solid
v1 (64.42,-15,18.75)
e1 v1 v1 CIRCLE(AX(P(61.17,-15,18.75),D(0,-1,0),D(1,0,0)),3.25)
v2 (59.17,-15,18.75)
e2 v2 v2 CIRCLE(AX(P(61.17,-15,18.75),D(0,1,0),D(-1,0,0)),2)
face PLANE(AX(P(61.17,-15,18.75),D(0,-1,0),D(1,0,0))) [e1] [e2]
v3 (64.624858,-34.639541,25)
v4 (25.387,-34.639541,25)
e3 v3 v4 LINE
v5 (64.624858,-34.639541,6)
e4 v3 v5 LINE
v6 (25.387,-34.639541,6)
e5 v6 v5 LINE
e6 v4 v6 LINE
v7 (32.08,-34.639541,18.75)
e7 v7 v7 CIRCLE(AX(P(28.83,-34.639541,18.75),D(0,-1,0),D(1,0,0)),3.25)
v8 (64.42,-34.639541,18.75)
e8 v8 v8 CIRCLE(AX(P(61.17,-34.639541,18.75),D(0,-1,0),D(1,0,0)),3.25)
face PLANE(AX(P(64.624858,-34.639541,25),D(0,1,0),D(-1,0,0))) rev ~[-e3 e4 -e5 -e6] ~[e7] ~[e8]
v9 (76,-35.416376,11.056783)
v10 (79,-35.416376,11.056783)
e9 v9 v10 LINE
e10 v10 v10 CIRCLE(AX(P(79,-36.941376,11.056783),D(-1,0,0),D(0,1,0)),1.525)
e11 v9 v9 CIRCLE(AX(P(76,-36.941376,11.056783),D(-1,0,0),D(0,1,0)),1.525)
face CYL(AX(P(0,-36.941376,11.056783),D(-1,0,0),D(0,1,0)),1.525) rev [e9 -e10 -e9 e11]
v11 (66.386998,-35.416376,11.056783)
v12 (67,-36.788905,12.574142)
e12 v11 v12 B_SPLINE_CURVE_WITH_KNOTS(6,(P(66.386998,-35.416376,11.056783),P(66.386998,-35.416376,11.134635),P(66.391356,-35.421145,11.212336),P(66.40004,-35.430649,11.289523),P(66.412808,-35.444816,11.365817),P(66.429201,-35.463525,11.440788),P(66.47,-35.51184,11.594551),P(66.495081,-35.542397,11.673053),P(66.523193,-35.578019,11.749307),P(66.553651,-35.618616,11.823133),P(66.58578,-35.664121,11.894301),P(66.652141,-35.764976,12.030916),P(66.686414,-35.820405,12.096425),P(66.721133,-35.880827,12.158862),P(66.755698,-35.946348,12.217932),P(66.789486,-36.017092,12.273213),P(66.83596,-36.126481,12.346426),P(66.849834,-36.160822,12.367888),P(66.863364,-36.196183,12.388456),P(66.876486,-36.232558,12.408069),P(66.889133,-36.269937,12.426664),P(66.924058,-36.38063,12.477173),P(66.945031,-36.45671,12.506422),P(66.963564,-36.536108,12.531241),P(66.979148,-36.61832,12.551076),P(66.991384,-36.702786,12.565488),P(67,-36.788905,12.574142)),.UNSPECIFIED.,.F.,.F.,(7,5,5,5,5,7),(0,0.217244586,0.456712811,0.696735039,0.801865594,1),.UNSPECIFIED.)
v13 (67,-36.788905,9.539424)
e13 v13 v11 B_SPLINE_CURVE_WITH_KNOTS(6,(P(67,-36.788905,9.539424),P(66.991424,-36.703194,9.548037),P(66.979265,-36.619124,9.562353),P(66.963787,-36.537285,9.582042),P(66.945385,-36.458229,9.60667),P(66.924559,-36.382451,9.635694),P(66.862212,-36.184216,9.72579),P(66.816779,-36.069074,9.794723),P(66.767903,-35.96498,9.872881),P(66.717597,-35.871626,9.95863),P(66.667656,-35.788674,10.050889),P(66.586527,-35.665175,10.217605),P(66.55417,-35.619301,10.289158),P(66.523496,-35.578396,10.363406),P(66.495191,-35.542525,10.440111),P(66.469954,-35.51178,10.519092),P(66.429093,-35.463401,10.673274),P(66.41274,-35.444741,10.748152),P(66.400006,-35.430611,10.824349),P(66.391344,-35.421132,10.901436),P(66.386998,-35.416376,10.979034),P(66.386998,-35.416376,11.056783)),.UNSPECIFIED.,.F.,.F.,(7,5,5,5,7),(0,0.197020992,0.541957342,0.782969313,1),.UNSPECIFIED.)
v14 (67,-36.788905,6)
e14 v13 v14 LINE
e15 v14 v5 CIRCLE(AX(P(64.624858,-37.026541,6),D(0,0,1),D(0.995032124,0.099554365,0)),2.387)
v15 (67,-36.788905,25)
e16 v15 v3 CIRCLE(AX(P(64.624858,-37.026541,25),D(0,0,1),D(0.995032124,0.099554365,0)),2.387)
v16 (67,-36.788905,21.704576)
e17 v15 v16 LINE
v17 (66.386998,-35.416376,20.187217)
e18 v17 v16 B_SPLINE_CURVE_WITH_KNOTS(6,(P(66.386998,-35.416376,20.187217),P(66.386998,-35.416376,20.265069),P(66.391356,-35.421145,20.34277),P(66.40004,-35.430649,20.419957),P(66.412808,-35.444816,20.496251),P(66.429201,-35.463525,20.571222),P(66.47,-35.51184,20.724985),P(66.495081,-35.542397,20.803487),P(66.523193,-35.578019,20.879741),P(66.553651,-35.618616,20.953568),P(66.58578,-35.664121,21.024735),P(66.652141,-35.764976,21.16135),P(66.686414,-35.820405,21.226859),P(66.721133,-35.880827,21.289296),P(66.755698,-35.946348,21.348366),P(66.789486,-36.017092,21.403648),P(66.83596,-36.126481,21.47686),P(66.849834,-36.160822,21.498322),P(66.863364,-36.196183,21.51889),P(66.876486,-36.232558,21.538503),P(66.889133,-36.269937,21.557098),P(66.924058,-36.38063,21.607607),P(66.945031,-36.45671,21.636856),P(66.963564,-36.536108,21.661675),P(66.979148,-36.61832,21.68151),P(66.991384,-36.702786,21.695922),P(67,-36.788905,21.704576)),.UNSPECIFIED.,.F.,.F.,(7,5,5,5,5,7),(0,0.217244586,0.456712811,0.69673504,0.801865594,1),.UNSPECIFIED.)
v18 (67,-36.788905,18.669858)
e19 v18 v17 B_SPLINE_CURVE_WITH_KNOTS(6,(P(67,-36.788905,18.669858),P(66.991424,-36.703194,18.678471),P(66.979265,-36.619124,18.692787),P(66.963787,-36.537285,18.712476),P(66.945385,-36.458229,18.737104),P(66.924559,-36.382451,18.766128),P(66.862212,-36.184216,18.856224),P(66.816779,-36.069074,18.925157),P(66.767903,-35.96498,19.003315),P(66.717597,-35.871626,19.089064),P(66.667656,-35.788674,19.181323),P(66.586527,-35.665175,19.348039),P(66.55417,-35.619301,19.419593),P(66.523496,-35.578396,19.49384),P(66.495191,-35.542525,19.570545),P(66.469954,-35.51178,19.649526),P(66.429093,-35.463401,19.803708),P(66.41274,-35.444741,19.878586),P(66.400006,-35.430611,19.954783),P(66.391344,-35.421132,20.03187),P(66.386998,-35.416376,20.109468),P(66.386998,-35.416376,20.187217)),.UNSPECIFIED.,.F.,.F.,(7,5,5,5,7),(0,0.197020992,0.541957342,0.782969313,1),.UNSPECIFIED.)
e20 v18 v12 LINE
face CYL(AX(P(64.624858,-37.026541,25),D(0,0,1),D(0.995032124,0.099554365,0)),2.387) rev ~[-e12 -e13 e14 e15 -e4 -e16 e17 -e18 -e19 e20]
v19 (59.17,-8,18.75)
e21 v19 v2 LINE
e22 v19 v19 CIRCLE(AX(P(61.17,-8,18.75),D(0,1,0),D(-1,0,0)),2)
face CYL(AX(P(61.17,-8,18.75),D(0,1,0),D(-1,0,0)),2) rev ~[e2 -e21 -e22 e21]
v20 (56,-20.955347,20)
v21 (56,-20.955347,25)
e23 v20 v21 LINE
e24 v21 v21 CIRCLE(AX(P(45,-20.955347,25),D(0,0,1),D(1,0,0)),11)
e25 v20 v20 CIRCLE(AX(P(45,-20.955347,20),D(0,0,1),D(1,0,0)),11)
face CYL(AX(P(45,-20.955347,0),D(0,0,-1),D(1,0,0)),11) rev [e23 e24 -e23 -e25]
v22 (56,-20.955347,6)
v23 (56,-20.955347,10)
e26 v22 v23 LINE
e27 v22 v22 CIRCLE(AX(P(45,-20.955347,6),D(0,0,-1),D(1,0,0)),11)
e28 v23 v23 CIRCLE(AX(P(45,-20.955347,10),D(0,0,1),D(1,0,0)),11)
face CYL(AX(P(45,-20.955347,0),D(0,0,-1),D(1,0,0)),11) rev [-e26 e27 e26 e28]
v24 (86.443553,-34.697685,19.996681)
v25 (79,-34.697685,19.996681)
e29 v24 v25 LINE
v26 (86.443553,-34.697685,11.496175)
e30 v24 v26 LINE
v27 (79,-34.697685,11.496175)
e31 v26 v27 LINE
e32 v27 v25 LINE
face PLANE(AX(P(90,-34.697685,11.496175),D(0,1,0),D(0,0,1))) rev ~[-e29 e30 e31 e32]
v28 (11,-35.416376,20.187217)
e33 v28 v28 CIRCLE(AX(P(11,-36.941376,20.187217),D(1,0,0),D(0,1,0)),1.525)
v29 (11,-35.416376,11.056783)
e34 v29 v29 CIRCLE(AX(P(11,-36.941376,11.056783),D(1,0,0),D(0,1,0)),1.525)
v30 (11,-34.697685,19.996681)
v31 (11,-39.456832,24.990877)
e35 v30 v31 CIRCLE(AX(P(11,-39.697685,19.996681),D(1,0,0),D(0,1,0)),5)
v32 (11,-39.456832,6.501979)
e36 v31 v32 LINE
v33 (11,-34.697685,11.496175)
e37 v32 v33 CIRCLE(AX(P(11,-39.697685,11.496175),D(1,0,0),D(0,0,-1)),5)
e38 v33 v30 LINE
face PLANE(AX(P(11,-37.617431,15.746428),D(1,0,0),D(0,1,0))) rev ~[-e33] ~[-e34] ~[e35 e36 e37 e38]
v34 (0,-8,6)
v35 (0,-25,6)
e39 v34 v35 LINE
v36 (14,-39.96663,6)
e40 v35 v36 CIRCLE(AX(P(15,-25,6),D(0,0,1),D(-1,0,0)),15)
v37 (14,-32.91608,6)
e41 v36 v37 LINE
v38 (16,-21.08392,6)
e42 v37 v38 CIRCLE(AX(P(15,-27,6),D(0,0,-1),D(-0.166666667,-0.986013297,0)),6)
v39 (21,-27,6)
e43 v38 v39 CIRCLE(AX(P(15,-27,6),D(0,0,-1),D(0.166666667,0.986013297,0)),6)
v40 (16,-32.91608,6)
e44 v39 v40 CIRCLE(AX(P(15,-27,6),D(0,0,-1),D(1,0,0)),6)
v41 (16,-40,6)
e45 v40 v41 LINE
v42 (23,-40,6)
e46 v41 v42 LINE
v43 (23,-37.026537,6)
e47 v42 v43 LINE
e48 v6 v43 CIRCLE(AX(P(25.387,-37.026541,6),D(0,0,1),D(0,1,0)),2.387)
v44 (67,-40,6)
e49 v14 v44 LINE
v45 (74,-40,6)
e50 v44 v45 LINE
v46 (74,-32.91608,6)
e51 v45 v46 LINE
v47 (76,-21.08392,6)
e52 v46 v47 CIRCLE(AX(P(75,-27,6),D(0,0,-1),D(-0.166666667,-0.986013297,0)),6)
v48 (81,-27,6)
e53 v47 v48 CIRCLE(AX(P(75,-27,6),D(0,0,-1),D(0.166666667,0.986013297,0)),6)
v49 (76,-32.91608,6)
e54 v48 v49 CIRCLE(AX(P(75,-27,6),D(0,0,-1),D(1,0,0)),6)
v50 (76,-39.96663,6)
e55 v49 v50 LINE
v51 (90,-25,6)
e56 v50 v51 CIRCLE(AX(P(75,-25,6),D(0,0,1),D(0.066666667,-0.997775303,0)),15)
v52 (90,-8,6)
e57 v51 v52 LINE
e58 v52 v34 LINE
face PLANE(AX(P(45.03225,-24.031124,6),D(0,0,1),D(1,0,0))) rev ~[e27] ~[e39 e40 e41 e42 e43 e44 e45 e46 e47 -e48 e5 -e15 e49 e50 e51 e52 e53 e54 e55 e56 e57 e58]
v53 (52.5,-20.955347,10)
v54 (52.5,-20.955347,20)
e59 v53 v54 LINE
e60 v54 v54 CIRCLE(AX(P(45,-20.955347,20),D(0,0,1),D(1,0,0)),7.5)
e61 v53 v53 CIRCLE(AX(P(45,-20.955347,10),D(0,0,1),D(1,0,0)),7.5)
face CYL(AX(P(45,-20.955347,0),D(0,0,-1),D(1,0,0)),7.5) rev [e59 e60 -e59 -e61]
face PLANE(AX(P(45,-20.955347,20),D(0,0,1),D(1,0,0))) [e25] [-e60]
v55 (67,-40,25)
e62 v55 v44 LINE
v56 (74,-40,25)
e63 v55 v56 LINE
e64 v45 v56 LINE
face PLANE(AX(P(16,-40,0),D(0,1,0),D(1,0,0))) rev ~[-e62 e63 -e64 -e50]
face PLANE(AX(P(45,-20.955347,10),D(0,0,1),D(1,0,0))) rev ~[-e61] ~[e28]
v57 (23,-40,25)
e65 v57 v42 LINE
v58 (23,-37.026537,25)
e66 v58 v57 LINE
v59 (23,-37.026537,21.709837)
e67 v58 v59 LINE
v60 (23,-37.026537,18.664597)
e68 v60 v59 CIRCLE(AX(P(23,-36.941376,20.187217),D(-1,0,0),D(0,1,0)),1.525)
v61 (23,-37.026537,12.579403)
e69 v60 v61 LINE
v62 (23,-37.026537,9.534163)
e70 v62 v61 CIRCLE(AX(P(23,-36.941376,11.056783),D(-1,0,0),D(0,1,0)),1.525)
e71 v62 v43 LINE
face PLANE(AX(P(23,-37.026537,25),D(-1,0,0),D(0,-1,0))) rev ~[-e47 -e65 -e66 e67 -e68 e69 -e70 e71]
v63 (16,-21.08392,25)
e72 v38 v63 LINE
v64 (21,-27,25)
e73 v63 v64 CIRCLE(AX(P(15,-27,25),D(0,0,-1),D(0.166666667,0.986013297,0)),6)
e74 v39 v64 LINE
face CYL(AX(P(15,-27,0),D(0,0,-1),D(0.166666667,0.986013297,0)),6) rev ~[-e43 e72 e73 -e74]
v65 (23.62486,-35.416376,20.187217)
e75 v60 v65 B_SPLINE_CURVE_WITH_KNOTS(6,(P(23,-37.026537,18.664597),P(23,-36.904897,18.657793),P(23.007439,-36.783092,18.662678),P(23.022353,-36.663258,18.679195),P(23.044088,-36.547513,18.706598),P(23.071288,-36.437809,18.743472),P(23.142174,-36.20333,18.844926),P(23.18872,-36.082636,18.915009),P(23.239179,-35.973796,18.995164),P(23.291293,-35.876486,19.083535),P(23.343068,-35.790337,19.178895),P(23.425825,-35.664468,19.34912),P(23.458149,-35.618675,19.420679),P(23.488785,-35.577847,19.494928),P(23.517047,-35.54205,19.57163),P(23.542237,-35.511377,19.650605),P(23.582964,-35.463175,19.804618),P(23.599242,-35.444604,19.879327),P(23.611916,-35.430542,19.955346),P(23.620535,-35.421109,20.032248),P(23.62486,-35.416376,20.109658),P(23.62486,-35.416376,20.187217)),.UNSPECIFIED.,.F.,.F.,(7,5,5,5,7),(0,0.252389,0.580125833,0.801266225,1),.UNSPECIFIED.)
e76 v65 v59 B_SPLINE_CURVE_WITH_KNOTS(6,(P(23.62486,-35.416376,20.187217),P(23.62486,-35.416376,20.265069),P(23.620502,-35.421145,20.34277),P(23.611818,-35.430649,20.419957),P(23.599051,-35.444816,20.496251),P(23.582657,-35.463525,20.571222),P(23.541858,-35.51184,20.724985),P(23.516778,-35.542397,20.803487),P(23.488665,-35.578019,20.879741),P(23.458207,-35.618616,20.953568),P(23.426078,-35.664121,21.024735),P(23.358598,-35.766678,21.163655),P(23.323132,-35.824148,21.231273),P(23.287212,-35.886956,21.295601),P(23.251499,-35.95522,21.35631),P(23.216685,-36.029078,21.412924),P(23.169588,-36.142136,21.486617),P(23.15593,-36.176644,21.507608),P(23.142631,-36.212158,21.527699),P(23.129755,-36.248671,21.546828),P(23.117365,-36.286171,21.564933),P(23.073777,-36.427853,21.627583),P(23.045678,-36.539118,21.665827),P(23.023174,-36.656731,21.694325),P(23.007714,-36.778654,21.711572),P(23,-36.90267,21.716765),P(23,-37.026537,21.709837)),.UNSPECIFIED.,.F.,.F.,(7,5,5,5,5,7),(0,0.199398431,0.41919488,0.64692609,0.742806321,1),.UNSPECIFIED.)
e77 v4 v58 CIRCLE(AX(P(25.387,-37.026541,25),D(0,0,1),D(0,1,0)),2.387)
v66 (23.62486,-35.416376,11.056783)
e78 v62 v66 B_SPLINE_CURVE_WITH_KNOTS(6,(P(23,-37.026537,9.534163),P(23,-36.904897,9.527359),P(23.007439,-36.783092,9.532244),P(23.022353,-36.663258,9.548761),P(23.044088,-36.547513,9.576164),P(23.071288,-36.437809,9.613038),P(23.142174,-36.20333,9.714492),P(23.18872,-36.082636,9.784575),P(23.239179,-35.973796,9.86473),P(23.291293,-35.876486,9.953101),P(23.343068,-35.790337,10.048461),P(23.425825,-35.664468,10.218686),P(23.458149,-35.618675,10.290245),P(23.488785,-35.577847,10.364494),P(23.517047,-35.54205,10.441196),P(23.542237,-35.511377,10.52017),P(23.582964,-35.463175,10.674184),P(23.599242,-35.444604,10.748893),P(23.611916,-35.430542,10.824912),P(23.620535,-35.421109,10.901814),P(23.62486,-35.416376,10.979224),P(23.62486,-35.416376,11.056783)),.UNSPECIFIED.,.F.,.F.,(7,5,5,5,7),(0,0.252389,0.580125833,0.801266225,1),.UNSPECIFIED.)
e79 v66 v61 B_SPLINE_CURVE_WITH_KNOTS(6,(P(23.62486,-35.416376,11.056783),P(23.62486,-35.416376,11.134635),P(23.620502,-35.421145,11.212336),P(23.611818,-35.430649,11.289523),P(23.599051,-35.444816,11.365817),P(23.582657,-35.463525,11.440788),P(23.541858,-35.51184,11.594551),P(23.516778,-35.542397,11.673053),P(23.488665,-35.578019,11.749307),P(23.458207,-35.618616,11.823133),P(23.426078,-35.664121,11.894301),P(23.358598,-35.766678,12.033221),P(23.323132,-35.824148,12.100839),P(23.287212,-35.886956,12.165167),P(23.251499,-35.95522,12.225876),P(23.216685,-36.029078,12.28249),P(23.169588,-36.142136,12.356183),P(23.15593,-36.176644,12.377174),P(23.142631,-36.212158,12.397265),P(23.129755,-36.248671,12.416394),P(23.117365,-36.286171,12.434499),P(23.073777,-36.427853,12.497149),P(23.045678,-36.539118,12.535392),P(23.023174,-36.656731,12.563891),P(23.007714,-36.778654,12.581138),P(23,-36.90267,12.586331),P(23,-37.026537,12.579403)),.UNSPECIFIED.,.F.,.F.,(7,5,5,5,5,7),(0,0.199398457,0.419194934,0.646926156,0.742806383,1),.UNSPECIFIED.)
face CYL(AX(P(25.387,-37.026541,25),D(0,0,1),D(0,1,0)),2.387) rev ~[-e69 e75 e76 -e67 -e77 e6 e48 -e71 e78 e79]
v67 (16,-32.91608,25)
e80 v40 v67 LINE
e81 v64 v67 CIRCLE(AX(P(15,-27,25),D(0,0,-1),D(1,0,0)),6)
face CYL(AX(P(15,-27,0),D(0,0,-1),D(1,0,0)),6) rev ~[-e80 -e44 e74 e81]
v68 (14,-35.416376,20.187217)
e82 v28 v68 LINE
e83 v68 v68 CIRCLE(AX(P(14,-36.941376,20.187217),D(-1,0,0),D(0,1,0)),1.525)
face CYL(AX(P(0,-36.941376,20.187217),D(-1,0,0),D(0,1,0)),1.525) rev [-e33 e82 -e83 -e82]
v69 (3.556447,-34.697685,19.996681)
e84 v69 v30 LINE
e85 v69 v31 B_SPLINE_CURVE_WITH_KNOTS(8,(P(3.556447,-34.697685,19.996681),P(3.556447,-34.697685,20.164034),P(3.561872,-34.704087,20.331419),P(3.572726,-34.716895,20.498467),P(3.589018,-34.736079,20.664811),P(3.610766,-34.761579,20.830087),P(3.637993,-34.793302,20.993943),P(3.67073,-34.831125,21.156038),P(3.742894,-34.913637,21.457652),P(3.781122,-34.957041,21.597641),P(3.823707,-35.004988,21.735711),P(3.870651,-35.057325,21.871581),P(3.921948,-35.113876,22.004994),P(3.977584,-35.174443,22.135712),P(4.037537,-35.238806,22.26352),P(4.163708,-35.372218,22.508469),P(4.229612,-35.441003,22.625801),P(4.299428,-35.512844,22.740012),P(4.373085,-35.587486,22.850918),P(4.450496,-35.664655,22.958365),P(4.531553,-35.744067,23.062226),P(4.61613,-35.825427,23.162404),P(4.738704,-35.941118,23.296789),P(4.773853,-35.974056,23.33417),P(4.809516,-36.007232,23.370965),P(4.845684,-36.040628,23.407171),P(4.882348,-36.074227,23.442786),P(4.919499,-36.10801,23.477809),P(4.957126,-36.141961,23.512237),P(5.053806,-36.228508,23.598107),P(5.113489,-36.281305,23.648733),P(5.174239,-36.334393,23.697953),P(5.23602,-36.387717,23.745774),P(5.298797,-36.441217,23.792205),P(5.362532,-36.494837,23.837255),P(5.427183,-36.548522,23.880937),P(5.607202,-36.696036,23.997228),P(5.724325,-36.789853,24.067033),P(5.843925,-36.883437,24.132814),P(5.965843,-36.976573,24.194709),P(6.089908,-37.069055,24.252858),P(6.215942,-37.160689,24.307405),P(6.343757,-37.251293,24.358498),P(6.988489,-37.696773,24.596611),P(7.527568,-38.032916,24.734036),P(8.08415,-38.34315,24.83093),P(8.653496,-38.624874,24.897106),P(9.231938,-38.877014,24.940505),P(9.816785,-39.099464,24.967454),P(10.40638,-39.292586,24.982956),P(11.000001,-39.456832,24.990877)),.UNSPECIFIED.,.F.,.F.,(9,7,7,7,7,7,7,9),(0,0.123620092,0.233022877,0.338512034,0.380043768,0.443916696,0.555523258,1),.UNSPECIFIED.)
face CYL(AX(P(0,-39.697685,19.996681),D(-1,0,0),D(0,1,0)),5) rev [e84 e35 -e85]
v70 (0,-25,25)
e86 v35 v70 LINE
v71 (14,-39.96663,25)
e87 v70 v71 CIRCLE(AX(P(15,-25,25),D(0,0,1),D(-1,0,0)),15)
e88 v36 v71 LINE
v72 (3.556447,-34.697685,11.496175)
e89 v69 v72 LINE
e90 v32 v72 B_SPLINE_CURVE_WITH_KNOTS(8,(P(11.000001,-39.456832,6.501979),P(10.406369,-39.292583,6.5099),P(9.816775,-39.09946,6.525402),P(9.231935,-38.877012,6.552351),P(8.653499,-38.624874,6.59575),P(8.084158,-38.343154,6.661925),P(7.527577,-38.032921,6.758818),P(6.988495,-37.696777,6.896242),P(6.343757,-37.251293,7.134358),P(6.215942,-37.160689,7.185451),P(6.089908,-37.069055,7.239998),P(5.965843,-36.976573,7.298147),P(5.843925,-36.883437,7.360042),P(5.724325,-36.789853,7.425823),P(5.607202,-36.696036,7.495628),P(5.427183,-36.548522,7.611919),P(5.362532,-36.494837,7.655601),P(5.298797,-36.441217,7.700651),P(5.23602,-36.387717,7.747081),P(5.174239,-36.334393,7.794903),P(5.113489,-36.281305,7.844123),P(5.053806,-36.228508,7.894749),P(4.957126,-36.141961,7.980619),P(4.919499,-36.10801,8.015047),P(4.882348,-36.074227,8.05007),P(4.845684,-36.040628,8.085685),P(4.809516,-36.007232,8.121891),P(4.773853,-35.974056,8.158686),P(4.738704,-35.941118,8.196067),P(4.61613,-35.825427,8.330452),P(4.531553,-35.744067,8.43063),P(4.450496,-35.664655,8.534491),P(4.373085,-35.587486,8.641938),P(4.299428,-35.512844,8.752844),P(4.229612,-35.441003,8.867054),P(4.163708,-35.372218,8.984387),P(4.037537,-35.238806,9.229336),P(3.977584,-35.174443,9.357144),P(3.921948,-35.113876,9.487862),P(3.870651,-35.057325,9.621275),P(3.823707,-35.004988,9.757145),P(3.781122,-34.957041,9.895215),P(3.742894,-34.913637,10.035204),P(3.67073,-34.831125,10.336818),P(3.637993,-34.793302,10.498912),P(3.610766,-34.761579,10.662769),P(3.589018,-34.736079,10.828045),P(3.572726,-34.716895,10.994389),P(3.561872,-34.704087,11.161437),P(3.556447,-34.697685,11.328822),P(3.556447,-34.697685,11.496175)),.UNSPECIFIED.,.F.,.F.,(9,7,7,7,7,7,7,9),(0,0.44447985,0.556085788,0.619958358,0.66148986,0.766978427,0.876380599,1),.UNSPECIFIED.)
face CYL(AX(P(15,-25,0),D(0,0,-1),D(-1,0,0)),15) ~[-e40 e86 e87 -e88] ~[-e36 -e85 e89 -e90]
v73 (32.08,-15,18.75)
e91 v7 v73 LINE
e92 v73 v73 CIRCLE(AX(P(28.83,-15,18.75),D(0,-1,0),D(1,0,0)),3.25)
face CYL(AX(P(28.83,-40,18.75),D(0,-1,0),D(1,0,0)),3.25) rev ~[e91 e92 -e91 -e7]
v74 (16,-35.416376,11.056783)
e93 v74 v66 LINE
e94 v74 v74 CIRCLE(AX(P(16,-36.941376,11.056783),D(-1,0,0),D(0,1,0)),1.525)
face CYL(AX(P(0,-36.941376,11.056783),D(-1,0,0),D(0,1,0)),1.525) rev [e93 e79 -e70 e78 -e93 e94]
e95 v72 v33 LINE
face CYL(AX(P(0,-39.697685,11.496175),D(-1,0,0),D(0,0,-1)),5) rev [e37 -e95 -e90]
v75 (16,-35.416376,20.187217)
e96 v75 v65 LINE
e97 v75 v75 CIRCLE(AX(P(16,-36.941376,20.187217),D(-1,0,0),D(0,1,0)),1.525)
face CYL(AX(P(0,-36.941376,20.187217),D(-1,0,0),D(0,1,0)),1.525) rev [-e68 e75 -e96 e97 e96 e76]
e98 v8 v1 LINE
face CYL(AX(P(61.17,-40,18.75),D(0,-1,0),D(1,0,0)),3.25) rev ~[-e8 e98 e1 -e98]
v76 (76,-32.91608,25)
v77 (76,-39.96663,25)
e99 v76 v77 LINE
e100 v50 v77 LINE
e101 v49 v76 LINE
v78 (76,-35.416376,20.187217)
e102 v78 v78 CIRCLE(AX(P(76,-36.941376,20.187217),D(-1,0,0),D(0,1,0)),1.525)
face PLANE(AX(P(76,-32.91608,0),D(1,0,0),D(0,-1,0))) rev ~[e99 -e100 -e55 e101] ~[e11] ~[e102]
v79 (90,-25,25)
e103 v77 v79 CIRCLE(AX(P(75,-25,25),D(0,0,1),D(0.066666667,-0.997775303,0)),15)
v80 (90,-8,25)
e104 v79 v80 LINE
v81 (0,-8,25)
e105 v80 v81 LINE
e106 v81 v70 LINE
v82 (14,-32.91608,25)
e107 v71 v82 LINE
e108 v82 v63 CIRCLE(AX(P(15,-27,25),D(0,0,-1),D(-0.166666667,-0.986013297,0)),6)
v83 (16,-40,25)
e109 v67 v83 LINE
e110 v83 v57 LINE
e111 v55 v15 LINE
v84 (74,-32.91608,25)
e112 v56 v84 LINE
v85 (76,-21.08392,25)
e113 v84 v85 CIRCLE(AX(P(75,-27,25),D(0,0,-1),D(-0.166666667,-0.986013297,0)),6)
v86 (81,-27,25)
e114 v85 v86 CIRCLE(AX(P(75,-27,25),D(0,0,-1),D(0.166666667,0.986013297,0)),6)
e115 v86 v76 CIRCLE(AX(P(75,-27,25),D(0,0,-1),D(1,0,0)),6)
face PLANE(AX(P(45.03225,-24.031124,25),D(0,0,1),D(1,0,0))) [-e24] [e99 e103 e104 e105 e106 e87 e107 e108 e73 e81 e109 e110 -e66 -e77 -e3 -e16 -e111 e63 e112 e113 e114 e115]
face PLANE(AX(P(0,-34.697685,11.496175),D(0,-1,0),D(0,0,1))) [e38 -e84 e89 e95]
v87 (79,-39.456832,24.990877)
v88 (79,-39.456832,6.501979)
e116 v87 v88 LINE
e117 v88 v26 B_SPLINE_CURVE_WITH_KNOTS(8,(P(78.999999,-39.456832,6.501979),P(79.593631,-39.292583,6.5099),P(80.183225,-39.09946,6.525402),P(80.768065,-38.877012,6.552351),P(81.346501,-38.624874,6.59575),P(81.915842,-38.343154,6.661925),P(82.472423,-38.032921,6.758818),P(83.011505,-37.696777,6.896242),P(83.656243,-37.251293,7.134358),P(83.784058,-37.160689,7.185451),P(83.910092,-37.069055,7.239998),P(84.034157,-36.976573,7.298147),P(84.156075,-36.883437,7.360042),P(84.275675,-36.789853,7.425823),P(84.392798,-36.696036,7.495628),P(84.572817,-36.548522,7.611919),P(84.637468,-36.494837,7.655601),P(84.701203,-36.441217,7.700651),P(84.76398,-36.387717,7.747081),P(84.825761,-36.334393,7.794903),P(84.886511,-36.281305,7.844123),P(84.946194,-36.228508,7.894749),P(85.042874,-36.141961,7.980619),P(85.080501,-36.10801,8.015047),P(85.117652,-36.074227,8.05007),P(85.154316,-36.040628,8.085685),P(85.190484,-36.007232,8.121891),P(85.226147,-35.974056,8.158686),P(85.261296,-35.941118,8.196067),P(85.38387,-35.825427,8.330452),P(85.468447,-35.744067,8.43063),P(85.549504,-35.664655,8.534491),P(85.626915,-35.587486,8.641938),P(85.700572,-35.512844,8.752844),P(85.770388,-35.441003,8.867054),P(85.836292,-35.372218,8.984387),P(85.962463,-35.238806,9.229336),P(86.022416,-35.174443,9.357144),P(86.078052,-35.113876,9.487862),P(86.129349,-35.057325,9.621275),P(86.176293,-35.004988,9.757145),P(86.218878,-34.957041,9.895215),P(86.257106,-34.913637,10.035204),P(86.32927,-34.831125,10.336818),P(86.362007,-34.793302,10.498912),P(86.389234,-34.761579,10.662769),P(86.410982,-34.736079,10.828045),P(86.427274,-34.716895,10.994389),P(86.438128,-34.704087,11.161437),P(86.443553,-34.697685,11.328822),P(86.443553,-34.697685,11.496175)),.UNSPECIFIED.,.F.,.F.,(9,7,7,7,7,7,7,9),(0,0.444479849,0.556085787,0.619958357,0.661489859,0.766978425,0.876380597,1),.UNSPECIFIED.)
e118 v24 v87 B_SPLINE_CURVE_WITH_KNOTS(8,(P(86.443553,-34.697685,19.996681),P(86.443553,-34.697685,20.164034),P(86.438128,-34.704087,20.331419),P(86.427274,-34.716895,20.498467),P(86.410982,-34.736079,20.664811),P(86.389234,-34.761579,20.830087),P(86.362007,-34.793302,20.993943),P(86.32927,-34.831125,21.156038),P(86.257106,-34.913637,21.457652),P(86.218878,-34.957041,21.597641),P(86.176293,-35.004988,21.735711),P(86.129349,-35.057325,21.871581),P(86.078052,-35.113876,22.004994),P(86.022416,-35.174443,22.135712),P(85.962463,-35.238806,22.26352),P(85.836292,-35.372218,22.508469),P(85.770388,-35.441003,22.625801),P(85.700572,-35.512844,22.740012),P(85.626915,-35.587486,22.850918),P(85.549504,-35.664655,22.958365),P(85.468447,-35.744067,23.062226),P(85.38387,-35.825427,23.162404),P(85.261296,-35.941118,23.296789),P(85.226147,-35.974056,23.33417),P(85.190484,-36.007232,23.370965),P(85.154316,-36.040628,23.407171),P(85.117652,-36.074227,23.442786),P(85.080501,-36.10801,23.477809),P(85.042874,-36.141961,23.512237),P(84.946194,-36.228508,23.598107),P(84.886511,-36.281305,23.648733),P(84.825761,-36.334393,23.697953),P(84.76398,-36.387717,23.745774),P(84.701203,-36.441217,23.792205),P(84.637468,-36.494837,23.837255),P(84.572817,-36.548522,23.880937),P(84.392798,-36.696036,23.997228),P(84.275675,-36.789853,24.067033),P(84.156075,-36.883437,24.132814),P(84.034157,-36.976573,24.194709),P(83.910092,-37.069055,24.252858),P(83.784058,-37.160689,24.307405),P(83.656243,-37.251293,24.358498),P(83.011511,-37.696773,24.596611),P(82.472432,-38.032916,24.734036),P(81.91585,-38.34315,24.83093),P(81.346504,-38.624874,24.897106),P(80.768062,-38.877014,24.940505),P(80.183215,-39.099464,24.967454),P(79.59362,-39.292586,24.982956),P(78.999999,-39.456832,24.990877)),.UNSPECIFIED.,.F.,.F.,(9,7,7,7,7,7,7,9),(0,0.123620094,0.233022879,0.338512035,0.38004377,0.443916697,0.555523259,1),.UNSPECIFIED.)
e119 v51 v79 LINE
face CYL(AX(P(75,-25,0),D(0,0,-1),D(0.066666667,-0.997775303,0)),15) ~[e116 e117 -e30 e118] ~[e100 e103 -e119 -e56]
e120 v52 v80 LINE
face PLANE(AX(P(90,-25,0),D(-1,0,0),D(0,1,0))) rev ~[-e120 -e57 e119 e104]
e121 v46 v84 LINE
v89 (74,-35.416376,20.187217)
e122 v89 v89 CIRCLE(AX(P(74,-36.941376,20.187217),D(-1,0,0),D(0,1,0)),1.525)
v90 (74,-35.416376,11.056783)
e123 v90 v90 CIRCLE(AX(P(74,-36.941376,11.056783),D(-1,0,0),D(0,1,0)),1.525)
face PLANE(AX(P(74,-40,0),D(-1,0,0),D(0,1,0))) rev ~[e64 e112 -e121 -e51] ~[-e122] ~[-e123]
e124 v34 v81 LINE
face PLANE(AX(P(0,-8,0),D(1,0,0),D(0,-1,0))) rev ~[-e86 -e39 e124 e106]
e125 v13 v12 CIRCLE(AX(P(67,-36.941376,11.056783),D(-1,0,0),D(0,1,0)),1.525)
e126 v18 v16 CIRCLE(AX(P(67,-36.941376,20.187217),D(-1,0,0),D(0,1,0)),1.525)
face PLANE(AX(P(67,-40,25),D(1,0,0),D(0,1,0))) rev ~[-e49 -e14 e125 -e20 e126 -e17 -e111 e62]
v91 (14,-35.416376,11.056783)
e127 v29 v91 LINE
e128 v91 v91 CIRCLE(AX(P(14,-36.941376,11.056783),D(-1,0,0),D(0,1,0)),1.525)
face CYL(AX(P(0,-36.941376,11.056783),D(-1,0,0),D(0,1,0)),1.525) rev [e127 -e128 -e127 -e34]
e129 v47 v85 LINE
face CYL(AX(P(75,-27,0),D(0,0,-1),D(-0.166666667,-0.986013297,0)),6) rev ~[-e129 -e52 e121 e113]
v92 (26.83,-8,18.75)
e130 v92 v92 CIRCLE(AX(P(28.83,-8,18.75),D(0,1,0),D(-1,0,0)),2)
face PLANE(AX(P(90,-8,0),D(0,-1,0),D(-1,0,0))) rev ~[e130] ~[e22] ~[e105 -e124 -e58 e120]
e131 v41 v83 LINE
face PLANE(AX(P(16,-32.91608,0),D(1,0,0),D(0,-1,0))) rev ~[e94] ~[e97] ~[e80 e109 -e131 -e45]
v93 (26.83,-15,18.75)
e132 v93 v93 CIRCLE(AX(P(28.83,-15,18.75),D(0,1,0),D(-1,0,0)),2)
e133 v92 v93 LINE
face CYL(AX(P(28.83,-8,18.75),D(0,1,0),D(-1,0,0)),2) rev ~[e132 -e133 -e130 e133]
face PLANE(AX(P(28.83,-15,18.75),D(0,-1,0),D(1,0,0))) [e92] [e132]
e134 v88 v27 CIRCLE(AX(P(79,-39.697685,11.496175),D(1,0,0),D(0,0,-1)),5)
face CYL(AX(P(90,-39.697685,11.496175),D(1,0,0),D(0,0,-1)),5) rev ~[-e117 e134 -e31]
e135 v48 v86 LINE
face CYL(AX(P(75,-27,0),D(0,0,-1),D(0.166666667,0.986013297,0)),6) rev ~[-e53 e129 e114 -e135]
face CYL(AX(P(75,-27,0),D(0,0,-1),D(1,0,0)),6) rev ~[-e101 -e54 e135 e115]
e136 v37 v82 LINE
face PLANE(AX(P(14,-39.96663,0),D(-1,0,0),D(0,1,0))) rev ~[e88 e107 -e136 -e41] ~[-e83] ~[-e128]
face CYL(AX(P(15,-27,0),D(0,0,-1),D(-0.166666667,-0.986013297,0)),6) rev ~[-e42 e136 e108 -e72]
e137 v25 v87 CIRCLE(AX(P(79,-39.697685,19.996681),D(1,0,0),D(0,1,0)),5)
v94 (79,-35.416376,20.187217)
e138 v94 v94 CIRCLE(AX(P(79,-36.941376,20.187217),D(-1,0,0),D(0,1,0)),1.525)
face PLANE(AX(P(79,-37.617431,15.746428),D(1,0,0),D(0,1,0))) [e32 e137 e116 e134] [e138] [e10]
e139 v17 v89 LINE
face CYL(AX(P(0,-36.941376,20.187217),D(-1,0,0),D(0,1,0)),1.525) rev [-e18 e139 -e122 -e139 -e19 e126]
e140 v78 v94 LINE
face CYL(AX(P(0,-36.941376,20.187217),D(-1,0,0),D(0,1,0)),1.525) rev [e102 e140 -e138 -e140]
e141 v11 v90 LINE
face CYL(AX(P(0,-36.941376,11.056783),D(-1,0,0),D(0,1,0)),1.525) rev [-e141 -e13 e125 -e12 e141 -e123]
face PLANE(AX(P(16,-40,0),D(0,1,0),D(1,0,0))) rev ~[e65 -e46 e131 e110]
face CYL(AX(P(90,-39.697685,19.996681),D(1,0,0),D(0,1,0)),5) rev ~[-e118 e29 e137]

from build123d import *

# Parameters (mm, degrees)
F0_R      = 11
F1_DEPTH  = 25
F3_R      = 1.525
F4_DEPTH  = 105.2
F5_DEPTH  = 11
F7_DEPTH  = 11
F0_R_2    = 7.5
F8_DEPTH  = 20
F9_DEPTH  = 5
F10_R     = 2
F11_DEPTH = 10
F13_DEPTH = 25.0010001
F14_DEPTH = 6
F15_DEPTH = 10
F16_R     = 3.25
F17_DEPTH = 25


# Not quite as in the source:
# - a feature names something its author has since deleted; it is built from what else it names


with BuildPart() as f1:
    # F0 (on Top) → F1 (new body)
    with BuildSketch(Plane.XY):
        with BuildLine():
            Line((90, -8), (0, -8))
            Line((0, -8), (0, -25))
            ThreePointArc((0, -25), (4.0455488499, -35.246950766), (14, -39.9666295471))
            Line((14, -39.9666295471), (14, -32.9160797831))
            ThreePointArc((14, -32.9160797831), (9, -27), (14, -21.0839202169))
            Line((14, -21.0839202169), (14, -14))
            Line((14, -14), (16, -14))
            Line((16, -14), (16, -21.0839202169))
            ThreePointArc((16, -21.0839202169), (19.582575695, -23.1270166538), (21, -27))
            ThreePointArc((21, -27), (19.582575695, -30.8729833462), (16, -32.9160797831))
            Line((16, -32.9160797831), (16, -40))
            Line((16, -40), (74, -40))
            Line((74, -40), (74, -32.9160797831))
            ThreePointArc((74, -32.9160797831), (69, -27), (74, -21.0839202169))
            Line((74, -21.0839202169), (74, -14))
            Line((74, -14), (76, -14))
            Line((76, -14), (76, -21.0839202169))
            ThreePointArc((76, -21.0839202169), (79.582575695, -23.1270166538), (81, -27))
            ThreePointArc((81, -27), (79.582575695, -30.8729833462), (76, -32.9160797831))
            Line((76, -32.9160797831), (76, -39.9666295471))
            ThreePointArc((76, -39.9666295471), (85.9544511501, -35.246950766), (90, -25))
            Line((90, -25), (90, -8))
        make_face()
        with Locations((45, -20.9553470761)):
            Circle(F0_R, mode=Mode.SUBTRACT)
        with BuildLine():
            Line((14, -14), (14, -21.0839202169))
            ThreePointArc((14, -21.0839202169), (15, -21), (16, -21.0839202169))
            Line((16, -21.0839202169), (16, -14))
            Line((16, -14), (14, -14))
        make_face()
        with BuildLine():
            ThreePointArc((74, -21.0839202169), (75, -21), (76, -21.0839202169))
            Line((76, -21.0839202169), (76, -14))
            Line((76, -14), (74, -14))
            Line((74, -14), (74, -21.0839202169))
        make_face()
    extrude(amount=F1_DEPTH)

    # F3 (on Right) → F4 (cut)
    with BuildSketch(Plane.YZ):
        with Locations((-36.9413755834, 11.0567829106)):
            Circle(F3_R)
        with Locations((-36.9413755834, 20.1872170437)):
            Circle(F3_R)
    extrude(amount=F4_DEPTH, mode=Mode.SUBTRACT)

    # F3 (on Right) → F5 (cut)
    with BuildSketch(Plane.YZ):
        with BuildLine():
            Line((-39.7998355329, 24.9966811389), (-39.7998355329, 6.4961747266))
            Line((-39.7998355329, 6.4961747266), (-39.6976853907, 6.4961747266))
            ThreePointArc((-39.6976853907, 6.4961747266), (-36.1621514848, 7.9606408207), (-34.6976853907, 11.4961747266))
            Line((-34.6976853907, 11.4961747266), (-34.6976853907, 19.9966811389))
            ThreePointArc((-34.6976853907, 19.9966811389), (-36.1621514848, 23.5322150448), (-39.6976853907, 24.9966811389))
            Line((-39.6976853907, 24.9966811389), (-39.7998355329, 24.9966811389))
        make_face()
        with Locations((-36.9413755834, 11.0567829106)):
            Circle(F3_R, mode=Mode.SUBTRACT)
        with Locations((-36.9413755834, 20.1872170437)):
            Circle(F3_R, mode=Mode.SUBTRACT)
    extrude(amount=F5_DEPTH, mode=Mode.SUBTRACT)

    # F6 (on offset) → F7 (cut)
    with BuildSketch(Plane.YZ.offset(90)):
        with BuildLine():
            Line((-39.7998355329, 24.9966811389), (-39.7998355329, 6.4961747266))
            Line((-39.7998355329, 6.4961747266), (-39.6976853907, 6.4961747266))
            ThreePointArc((-39.6976853907, 6.4961747266), (-36.1621514848, 7.9606408207), (-34.6976853907, 11.4961747266))
            Line((-34.6976853907, 11.4961747266), (-34.6976853907, 19.9966811389))
            ThreePointArc((-34.6976853907, 19.9966811389), (-36.1621514848, 23.5322150448), (-39.6976853907, 24.9966811389))
            Line((-39.6976853907, 24.9966811389), (-39.7998355329, 24.9966811389))
        make_face()
    extrude(amount=-F7_DEPTH, mode=Mode.SUBTRACT)

    # F0 (on Top) → F8 (join)
    with BuildSketch(Plane.XY):
        with Locations((45, -20.9553470761)):
            Circle(F0_R)
        with Locations((45, -20.9553470761)):
            Circle(F0_R_2, mode=Mode.SUBTRACT)
    extrude(amount=F8_DEPTH)

    # F0 (on Top) → F9 (cut)
    with BuildSketch(Plane.XY):
        with Locations((45, -20.9553470761)):
            Circle(F0_R)
        with Locations((45, -20.9553470761)):
            Circle(F0_R_2, mode=Mode.SUBTRACT)
    extrude(amount=F9_DEPTH, mode=Mode.SUBTRACT)

    # F10 (on face) → F11 (cut)
    with BuildSketch(Plane(origin=(0, -8, 0), x_dir=(-1, 0, 0), z_dir=(0, 1, 0))):
        with Locations((-28.83, 18.75)):
            Circle(F10_R)
        with Locations((-61.17, 18.75)):
            Circle(F10_R)
    extrude(amount=-F11_DEPTH, mode=Mode.SUBTRACT)

    # F12 (on face) → F13 (cut, through all)
    with BuildSketch(Plane.XY.offset(25)):
        with BuildLine():
            Line((45, -40), (45, -34.6395410597))
            Line((45, -34.6395410597), (25.387, -34.6395410597))
            ThreePointArc((25.387, -34.6395410597), (23.6991374304, -35.338675856), (23, -37.0265373344))
            Line((23, -37.0265373344), (23, -40))
            Line((23, -40), (45, -40))
        make_face()
        with BuildLine():
            ThreePointArc((67, -36.7889047916), (66.2265029782, -35.2566531011), (64.6248583192, -34.6395410597))
            Line((64.6248583192, -34.6395410597), (45, -34.6395410597))
            Line((45, -34.6395410597), (45, -40))
            Line((45, -40), (67, -40))
            Line((67, -40), (67, -36.7889047916))
        make_face()
    extrude(amount=-F13_DEPTH, mode=Mode.SUBTRACT)

    # F0 (on Top) → F14 (cut)
    with BuildSketch(Plane.XY):
        with BuildLine():
            Line((90, -8), (0, -8))
            Line((0, -8), (0, -25))
            ThreePointArc((0, -25), (4.0455488499, -35.246950766), (14, -39.9666295471))
            Line((14, -39.9666295471), (14, -32.9160797831))
            ThreePointArc((14, -32.9160797831), (9, -27), (14, -21.0839202169))
            Line((14, -21.0839202169), (14, -14))
            Line((14, -14), (16, -14))
            Line((16, -14), (16, -21.0839202169))
            ThreePointArc((16, -21.0839202169), (19.582575695, -23.1270166538), (21, -27))
            ThreePointArc((21, -27), (19.582575695, -30.8729833462), (16, -32.9160797831))
            Line((16, -32.9160797831), (16, -40))
            Line((16, -40), (74, -40))
            Line((74, -40), (74, -32.9160797831))
            ThreePointArc((74, -32.9160797831), (69, -27), (74, -21.0839202169))
            Line((74, -21.0839202169), (74, -14))
            Line((74, -14), (76, -14))
            Line((76, -14), (76, -21.0839202169))
            ThreePointArc((76, -21.0839202169), (79.582575695, -23.1270166538), (81, -27))
            ThreePointArc((81, -27), (79.582575695, -30.8729833462), (76, -32.9160797831))
            Line((76, -32.9160797831), (76, -39.9666295471))
            ThreePointArc((76, -39.9666295471), (85.9544511501, -35.246950766), (90, -25))
            Line((90, -25), (90, -8))
        make_face()
        with Locations((45, -20.9553470761)):
            Circle(F0_R, mode=Mode.SUBTRACT)
        with BuildLine():
            Line((14, -14), (14, -21.0839202169))
            ThreePointArc((14, -21.0839202169), (15, -21), (16, -21.0839202169))
            Line((16, -21.0839202169), (16, -14))
            Line((16, -14), (14, -14))
        make_face()
        with BuildLine():
            ThreePointArc((74, -21.0839202169), (75, -21), (76, -21.0839202169))
            Line((76, -21.0839202169), (76, -14))
            Line((76, -14), (74, -14))
            Line((74, -14), (74, -21.0839202169))
        make_face()
        with Locations((45, -20.9553470761)):
            Circle(F0_R)
        with Locations((45, -20.9553470761)):
            Circle(F0_R_2, mode=Mode.SUBTRACT)
    extrude(amount=F14_DEPTH, mode=Mode.SUBTRACT)

    # F0 (on Top) → F15 (cut)
    with BuildSketch(Plane.XY):
        with Locations((45, -20.9553470761)):
            Circle(F0_R)
        with Locations((45, -20.9553470761)):
            Circle(F0_R_2, mode=Mode.SUBTRACT)
    extrude(amount=F15_DEPTH, mode=Mode.SUBTRACT)

    # F16 (on face) → F17 (cut)
    with BuildSketch(Plane.XZ.offset(40)):
        with Locations((28.83, 18.75)):
            Circle(F16_R)
        with Locations((61.17, 18.75)):
            Circle(F16_R)
    extrude(amount=-F17_DEPTH, mode=Mode.SUBTRACT)


solid = f1.part
